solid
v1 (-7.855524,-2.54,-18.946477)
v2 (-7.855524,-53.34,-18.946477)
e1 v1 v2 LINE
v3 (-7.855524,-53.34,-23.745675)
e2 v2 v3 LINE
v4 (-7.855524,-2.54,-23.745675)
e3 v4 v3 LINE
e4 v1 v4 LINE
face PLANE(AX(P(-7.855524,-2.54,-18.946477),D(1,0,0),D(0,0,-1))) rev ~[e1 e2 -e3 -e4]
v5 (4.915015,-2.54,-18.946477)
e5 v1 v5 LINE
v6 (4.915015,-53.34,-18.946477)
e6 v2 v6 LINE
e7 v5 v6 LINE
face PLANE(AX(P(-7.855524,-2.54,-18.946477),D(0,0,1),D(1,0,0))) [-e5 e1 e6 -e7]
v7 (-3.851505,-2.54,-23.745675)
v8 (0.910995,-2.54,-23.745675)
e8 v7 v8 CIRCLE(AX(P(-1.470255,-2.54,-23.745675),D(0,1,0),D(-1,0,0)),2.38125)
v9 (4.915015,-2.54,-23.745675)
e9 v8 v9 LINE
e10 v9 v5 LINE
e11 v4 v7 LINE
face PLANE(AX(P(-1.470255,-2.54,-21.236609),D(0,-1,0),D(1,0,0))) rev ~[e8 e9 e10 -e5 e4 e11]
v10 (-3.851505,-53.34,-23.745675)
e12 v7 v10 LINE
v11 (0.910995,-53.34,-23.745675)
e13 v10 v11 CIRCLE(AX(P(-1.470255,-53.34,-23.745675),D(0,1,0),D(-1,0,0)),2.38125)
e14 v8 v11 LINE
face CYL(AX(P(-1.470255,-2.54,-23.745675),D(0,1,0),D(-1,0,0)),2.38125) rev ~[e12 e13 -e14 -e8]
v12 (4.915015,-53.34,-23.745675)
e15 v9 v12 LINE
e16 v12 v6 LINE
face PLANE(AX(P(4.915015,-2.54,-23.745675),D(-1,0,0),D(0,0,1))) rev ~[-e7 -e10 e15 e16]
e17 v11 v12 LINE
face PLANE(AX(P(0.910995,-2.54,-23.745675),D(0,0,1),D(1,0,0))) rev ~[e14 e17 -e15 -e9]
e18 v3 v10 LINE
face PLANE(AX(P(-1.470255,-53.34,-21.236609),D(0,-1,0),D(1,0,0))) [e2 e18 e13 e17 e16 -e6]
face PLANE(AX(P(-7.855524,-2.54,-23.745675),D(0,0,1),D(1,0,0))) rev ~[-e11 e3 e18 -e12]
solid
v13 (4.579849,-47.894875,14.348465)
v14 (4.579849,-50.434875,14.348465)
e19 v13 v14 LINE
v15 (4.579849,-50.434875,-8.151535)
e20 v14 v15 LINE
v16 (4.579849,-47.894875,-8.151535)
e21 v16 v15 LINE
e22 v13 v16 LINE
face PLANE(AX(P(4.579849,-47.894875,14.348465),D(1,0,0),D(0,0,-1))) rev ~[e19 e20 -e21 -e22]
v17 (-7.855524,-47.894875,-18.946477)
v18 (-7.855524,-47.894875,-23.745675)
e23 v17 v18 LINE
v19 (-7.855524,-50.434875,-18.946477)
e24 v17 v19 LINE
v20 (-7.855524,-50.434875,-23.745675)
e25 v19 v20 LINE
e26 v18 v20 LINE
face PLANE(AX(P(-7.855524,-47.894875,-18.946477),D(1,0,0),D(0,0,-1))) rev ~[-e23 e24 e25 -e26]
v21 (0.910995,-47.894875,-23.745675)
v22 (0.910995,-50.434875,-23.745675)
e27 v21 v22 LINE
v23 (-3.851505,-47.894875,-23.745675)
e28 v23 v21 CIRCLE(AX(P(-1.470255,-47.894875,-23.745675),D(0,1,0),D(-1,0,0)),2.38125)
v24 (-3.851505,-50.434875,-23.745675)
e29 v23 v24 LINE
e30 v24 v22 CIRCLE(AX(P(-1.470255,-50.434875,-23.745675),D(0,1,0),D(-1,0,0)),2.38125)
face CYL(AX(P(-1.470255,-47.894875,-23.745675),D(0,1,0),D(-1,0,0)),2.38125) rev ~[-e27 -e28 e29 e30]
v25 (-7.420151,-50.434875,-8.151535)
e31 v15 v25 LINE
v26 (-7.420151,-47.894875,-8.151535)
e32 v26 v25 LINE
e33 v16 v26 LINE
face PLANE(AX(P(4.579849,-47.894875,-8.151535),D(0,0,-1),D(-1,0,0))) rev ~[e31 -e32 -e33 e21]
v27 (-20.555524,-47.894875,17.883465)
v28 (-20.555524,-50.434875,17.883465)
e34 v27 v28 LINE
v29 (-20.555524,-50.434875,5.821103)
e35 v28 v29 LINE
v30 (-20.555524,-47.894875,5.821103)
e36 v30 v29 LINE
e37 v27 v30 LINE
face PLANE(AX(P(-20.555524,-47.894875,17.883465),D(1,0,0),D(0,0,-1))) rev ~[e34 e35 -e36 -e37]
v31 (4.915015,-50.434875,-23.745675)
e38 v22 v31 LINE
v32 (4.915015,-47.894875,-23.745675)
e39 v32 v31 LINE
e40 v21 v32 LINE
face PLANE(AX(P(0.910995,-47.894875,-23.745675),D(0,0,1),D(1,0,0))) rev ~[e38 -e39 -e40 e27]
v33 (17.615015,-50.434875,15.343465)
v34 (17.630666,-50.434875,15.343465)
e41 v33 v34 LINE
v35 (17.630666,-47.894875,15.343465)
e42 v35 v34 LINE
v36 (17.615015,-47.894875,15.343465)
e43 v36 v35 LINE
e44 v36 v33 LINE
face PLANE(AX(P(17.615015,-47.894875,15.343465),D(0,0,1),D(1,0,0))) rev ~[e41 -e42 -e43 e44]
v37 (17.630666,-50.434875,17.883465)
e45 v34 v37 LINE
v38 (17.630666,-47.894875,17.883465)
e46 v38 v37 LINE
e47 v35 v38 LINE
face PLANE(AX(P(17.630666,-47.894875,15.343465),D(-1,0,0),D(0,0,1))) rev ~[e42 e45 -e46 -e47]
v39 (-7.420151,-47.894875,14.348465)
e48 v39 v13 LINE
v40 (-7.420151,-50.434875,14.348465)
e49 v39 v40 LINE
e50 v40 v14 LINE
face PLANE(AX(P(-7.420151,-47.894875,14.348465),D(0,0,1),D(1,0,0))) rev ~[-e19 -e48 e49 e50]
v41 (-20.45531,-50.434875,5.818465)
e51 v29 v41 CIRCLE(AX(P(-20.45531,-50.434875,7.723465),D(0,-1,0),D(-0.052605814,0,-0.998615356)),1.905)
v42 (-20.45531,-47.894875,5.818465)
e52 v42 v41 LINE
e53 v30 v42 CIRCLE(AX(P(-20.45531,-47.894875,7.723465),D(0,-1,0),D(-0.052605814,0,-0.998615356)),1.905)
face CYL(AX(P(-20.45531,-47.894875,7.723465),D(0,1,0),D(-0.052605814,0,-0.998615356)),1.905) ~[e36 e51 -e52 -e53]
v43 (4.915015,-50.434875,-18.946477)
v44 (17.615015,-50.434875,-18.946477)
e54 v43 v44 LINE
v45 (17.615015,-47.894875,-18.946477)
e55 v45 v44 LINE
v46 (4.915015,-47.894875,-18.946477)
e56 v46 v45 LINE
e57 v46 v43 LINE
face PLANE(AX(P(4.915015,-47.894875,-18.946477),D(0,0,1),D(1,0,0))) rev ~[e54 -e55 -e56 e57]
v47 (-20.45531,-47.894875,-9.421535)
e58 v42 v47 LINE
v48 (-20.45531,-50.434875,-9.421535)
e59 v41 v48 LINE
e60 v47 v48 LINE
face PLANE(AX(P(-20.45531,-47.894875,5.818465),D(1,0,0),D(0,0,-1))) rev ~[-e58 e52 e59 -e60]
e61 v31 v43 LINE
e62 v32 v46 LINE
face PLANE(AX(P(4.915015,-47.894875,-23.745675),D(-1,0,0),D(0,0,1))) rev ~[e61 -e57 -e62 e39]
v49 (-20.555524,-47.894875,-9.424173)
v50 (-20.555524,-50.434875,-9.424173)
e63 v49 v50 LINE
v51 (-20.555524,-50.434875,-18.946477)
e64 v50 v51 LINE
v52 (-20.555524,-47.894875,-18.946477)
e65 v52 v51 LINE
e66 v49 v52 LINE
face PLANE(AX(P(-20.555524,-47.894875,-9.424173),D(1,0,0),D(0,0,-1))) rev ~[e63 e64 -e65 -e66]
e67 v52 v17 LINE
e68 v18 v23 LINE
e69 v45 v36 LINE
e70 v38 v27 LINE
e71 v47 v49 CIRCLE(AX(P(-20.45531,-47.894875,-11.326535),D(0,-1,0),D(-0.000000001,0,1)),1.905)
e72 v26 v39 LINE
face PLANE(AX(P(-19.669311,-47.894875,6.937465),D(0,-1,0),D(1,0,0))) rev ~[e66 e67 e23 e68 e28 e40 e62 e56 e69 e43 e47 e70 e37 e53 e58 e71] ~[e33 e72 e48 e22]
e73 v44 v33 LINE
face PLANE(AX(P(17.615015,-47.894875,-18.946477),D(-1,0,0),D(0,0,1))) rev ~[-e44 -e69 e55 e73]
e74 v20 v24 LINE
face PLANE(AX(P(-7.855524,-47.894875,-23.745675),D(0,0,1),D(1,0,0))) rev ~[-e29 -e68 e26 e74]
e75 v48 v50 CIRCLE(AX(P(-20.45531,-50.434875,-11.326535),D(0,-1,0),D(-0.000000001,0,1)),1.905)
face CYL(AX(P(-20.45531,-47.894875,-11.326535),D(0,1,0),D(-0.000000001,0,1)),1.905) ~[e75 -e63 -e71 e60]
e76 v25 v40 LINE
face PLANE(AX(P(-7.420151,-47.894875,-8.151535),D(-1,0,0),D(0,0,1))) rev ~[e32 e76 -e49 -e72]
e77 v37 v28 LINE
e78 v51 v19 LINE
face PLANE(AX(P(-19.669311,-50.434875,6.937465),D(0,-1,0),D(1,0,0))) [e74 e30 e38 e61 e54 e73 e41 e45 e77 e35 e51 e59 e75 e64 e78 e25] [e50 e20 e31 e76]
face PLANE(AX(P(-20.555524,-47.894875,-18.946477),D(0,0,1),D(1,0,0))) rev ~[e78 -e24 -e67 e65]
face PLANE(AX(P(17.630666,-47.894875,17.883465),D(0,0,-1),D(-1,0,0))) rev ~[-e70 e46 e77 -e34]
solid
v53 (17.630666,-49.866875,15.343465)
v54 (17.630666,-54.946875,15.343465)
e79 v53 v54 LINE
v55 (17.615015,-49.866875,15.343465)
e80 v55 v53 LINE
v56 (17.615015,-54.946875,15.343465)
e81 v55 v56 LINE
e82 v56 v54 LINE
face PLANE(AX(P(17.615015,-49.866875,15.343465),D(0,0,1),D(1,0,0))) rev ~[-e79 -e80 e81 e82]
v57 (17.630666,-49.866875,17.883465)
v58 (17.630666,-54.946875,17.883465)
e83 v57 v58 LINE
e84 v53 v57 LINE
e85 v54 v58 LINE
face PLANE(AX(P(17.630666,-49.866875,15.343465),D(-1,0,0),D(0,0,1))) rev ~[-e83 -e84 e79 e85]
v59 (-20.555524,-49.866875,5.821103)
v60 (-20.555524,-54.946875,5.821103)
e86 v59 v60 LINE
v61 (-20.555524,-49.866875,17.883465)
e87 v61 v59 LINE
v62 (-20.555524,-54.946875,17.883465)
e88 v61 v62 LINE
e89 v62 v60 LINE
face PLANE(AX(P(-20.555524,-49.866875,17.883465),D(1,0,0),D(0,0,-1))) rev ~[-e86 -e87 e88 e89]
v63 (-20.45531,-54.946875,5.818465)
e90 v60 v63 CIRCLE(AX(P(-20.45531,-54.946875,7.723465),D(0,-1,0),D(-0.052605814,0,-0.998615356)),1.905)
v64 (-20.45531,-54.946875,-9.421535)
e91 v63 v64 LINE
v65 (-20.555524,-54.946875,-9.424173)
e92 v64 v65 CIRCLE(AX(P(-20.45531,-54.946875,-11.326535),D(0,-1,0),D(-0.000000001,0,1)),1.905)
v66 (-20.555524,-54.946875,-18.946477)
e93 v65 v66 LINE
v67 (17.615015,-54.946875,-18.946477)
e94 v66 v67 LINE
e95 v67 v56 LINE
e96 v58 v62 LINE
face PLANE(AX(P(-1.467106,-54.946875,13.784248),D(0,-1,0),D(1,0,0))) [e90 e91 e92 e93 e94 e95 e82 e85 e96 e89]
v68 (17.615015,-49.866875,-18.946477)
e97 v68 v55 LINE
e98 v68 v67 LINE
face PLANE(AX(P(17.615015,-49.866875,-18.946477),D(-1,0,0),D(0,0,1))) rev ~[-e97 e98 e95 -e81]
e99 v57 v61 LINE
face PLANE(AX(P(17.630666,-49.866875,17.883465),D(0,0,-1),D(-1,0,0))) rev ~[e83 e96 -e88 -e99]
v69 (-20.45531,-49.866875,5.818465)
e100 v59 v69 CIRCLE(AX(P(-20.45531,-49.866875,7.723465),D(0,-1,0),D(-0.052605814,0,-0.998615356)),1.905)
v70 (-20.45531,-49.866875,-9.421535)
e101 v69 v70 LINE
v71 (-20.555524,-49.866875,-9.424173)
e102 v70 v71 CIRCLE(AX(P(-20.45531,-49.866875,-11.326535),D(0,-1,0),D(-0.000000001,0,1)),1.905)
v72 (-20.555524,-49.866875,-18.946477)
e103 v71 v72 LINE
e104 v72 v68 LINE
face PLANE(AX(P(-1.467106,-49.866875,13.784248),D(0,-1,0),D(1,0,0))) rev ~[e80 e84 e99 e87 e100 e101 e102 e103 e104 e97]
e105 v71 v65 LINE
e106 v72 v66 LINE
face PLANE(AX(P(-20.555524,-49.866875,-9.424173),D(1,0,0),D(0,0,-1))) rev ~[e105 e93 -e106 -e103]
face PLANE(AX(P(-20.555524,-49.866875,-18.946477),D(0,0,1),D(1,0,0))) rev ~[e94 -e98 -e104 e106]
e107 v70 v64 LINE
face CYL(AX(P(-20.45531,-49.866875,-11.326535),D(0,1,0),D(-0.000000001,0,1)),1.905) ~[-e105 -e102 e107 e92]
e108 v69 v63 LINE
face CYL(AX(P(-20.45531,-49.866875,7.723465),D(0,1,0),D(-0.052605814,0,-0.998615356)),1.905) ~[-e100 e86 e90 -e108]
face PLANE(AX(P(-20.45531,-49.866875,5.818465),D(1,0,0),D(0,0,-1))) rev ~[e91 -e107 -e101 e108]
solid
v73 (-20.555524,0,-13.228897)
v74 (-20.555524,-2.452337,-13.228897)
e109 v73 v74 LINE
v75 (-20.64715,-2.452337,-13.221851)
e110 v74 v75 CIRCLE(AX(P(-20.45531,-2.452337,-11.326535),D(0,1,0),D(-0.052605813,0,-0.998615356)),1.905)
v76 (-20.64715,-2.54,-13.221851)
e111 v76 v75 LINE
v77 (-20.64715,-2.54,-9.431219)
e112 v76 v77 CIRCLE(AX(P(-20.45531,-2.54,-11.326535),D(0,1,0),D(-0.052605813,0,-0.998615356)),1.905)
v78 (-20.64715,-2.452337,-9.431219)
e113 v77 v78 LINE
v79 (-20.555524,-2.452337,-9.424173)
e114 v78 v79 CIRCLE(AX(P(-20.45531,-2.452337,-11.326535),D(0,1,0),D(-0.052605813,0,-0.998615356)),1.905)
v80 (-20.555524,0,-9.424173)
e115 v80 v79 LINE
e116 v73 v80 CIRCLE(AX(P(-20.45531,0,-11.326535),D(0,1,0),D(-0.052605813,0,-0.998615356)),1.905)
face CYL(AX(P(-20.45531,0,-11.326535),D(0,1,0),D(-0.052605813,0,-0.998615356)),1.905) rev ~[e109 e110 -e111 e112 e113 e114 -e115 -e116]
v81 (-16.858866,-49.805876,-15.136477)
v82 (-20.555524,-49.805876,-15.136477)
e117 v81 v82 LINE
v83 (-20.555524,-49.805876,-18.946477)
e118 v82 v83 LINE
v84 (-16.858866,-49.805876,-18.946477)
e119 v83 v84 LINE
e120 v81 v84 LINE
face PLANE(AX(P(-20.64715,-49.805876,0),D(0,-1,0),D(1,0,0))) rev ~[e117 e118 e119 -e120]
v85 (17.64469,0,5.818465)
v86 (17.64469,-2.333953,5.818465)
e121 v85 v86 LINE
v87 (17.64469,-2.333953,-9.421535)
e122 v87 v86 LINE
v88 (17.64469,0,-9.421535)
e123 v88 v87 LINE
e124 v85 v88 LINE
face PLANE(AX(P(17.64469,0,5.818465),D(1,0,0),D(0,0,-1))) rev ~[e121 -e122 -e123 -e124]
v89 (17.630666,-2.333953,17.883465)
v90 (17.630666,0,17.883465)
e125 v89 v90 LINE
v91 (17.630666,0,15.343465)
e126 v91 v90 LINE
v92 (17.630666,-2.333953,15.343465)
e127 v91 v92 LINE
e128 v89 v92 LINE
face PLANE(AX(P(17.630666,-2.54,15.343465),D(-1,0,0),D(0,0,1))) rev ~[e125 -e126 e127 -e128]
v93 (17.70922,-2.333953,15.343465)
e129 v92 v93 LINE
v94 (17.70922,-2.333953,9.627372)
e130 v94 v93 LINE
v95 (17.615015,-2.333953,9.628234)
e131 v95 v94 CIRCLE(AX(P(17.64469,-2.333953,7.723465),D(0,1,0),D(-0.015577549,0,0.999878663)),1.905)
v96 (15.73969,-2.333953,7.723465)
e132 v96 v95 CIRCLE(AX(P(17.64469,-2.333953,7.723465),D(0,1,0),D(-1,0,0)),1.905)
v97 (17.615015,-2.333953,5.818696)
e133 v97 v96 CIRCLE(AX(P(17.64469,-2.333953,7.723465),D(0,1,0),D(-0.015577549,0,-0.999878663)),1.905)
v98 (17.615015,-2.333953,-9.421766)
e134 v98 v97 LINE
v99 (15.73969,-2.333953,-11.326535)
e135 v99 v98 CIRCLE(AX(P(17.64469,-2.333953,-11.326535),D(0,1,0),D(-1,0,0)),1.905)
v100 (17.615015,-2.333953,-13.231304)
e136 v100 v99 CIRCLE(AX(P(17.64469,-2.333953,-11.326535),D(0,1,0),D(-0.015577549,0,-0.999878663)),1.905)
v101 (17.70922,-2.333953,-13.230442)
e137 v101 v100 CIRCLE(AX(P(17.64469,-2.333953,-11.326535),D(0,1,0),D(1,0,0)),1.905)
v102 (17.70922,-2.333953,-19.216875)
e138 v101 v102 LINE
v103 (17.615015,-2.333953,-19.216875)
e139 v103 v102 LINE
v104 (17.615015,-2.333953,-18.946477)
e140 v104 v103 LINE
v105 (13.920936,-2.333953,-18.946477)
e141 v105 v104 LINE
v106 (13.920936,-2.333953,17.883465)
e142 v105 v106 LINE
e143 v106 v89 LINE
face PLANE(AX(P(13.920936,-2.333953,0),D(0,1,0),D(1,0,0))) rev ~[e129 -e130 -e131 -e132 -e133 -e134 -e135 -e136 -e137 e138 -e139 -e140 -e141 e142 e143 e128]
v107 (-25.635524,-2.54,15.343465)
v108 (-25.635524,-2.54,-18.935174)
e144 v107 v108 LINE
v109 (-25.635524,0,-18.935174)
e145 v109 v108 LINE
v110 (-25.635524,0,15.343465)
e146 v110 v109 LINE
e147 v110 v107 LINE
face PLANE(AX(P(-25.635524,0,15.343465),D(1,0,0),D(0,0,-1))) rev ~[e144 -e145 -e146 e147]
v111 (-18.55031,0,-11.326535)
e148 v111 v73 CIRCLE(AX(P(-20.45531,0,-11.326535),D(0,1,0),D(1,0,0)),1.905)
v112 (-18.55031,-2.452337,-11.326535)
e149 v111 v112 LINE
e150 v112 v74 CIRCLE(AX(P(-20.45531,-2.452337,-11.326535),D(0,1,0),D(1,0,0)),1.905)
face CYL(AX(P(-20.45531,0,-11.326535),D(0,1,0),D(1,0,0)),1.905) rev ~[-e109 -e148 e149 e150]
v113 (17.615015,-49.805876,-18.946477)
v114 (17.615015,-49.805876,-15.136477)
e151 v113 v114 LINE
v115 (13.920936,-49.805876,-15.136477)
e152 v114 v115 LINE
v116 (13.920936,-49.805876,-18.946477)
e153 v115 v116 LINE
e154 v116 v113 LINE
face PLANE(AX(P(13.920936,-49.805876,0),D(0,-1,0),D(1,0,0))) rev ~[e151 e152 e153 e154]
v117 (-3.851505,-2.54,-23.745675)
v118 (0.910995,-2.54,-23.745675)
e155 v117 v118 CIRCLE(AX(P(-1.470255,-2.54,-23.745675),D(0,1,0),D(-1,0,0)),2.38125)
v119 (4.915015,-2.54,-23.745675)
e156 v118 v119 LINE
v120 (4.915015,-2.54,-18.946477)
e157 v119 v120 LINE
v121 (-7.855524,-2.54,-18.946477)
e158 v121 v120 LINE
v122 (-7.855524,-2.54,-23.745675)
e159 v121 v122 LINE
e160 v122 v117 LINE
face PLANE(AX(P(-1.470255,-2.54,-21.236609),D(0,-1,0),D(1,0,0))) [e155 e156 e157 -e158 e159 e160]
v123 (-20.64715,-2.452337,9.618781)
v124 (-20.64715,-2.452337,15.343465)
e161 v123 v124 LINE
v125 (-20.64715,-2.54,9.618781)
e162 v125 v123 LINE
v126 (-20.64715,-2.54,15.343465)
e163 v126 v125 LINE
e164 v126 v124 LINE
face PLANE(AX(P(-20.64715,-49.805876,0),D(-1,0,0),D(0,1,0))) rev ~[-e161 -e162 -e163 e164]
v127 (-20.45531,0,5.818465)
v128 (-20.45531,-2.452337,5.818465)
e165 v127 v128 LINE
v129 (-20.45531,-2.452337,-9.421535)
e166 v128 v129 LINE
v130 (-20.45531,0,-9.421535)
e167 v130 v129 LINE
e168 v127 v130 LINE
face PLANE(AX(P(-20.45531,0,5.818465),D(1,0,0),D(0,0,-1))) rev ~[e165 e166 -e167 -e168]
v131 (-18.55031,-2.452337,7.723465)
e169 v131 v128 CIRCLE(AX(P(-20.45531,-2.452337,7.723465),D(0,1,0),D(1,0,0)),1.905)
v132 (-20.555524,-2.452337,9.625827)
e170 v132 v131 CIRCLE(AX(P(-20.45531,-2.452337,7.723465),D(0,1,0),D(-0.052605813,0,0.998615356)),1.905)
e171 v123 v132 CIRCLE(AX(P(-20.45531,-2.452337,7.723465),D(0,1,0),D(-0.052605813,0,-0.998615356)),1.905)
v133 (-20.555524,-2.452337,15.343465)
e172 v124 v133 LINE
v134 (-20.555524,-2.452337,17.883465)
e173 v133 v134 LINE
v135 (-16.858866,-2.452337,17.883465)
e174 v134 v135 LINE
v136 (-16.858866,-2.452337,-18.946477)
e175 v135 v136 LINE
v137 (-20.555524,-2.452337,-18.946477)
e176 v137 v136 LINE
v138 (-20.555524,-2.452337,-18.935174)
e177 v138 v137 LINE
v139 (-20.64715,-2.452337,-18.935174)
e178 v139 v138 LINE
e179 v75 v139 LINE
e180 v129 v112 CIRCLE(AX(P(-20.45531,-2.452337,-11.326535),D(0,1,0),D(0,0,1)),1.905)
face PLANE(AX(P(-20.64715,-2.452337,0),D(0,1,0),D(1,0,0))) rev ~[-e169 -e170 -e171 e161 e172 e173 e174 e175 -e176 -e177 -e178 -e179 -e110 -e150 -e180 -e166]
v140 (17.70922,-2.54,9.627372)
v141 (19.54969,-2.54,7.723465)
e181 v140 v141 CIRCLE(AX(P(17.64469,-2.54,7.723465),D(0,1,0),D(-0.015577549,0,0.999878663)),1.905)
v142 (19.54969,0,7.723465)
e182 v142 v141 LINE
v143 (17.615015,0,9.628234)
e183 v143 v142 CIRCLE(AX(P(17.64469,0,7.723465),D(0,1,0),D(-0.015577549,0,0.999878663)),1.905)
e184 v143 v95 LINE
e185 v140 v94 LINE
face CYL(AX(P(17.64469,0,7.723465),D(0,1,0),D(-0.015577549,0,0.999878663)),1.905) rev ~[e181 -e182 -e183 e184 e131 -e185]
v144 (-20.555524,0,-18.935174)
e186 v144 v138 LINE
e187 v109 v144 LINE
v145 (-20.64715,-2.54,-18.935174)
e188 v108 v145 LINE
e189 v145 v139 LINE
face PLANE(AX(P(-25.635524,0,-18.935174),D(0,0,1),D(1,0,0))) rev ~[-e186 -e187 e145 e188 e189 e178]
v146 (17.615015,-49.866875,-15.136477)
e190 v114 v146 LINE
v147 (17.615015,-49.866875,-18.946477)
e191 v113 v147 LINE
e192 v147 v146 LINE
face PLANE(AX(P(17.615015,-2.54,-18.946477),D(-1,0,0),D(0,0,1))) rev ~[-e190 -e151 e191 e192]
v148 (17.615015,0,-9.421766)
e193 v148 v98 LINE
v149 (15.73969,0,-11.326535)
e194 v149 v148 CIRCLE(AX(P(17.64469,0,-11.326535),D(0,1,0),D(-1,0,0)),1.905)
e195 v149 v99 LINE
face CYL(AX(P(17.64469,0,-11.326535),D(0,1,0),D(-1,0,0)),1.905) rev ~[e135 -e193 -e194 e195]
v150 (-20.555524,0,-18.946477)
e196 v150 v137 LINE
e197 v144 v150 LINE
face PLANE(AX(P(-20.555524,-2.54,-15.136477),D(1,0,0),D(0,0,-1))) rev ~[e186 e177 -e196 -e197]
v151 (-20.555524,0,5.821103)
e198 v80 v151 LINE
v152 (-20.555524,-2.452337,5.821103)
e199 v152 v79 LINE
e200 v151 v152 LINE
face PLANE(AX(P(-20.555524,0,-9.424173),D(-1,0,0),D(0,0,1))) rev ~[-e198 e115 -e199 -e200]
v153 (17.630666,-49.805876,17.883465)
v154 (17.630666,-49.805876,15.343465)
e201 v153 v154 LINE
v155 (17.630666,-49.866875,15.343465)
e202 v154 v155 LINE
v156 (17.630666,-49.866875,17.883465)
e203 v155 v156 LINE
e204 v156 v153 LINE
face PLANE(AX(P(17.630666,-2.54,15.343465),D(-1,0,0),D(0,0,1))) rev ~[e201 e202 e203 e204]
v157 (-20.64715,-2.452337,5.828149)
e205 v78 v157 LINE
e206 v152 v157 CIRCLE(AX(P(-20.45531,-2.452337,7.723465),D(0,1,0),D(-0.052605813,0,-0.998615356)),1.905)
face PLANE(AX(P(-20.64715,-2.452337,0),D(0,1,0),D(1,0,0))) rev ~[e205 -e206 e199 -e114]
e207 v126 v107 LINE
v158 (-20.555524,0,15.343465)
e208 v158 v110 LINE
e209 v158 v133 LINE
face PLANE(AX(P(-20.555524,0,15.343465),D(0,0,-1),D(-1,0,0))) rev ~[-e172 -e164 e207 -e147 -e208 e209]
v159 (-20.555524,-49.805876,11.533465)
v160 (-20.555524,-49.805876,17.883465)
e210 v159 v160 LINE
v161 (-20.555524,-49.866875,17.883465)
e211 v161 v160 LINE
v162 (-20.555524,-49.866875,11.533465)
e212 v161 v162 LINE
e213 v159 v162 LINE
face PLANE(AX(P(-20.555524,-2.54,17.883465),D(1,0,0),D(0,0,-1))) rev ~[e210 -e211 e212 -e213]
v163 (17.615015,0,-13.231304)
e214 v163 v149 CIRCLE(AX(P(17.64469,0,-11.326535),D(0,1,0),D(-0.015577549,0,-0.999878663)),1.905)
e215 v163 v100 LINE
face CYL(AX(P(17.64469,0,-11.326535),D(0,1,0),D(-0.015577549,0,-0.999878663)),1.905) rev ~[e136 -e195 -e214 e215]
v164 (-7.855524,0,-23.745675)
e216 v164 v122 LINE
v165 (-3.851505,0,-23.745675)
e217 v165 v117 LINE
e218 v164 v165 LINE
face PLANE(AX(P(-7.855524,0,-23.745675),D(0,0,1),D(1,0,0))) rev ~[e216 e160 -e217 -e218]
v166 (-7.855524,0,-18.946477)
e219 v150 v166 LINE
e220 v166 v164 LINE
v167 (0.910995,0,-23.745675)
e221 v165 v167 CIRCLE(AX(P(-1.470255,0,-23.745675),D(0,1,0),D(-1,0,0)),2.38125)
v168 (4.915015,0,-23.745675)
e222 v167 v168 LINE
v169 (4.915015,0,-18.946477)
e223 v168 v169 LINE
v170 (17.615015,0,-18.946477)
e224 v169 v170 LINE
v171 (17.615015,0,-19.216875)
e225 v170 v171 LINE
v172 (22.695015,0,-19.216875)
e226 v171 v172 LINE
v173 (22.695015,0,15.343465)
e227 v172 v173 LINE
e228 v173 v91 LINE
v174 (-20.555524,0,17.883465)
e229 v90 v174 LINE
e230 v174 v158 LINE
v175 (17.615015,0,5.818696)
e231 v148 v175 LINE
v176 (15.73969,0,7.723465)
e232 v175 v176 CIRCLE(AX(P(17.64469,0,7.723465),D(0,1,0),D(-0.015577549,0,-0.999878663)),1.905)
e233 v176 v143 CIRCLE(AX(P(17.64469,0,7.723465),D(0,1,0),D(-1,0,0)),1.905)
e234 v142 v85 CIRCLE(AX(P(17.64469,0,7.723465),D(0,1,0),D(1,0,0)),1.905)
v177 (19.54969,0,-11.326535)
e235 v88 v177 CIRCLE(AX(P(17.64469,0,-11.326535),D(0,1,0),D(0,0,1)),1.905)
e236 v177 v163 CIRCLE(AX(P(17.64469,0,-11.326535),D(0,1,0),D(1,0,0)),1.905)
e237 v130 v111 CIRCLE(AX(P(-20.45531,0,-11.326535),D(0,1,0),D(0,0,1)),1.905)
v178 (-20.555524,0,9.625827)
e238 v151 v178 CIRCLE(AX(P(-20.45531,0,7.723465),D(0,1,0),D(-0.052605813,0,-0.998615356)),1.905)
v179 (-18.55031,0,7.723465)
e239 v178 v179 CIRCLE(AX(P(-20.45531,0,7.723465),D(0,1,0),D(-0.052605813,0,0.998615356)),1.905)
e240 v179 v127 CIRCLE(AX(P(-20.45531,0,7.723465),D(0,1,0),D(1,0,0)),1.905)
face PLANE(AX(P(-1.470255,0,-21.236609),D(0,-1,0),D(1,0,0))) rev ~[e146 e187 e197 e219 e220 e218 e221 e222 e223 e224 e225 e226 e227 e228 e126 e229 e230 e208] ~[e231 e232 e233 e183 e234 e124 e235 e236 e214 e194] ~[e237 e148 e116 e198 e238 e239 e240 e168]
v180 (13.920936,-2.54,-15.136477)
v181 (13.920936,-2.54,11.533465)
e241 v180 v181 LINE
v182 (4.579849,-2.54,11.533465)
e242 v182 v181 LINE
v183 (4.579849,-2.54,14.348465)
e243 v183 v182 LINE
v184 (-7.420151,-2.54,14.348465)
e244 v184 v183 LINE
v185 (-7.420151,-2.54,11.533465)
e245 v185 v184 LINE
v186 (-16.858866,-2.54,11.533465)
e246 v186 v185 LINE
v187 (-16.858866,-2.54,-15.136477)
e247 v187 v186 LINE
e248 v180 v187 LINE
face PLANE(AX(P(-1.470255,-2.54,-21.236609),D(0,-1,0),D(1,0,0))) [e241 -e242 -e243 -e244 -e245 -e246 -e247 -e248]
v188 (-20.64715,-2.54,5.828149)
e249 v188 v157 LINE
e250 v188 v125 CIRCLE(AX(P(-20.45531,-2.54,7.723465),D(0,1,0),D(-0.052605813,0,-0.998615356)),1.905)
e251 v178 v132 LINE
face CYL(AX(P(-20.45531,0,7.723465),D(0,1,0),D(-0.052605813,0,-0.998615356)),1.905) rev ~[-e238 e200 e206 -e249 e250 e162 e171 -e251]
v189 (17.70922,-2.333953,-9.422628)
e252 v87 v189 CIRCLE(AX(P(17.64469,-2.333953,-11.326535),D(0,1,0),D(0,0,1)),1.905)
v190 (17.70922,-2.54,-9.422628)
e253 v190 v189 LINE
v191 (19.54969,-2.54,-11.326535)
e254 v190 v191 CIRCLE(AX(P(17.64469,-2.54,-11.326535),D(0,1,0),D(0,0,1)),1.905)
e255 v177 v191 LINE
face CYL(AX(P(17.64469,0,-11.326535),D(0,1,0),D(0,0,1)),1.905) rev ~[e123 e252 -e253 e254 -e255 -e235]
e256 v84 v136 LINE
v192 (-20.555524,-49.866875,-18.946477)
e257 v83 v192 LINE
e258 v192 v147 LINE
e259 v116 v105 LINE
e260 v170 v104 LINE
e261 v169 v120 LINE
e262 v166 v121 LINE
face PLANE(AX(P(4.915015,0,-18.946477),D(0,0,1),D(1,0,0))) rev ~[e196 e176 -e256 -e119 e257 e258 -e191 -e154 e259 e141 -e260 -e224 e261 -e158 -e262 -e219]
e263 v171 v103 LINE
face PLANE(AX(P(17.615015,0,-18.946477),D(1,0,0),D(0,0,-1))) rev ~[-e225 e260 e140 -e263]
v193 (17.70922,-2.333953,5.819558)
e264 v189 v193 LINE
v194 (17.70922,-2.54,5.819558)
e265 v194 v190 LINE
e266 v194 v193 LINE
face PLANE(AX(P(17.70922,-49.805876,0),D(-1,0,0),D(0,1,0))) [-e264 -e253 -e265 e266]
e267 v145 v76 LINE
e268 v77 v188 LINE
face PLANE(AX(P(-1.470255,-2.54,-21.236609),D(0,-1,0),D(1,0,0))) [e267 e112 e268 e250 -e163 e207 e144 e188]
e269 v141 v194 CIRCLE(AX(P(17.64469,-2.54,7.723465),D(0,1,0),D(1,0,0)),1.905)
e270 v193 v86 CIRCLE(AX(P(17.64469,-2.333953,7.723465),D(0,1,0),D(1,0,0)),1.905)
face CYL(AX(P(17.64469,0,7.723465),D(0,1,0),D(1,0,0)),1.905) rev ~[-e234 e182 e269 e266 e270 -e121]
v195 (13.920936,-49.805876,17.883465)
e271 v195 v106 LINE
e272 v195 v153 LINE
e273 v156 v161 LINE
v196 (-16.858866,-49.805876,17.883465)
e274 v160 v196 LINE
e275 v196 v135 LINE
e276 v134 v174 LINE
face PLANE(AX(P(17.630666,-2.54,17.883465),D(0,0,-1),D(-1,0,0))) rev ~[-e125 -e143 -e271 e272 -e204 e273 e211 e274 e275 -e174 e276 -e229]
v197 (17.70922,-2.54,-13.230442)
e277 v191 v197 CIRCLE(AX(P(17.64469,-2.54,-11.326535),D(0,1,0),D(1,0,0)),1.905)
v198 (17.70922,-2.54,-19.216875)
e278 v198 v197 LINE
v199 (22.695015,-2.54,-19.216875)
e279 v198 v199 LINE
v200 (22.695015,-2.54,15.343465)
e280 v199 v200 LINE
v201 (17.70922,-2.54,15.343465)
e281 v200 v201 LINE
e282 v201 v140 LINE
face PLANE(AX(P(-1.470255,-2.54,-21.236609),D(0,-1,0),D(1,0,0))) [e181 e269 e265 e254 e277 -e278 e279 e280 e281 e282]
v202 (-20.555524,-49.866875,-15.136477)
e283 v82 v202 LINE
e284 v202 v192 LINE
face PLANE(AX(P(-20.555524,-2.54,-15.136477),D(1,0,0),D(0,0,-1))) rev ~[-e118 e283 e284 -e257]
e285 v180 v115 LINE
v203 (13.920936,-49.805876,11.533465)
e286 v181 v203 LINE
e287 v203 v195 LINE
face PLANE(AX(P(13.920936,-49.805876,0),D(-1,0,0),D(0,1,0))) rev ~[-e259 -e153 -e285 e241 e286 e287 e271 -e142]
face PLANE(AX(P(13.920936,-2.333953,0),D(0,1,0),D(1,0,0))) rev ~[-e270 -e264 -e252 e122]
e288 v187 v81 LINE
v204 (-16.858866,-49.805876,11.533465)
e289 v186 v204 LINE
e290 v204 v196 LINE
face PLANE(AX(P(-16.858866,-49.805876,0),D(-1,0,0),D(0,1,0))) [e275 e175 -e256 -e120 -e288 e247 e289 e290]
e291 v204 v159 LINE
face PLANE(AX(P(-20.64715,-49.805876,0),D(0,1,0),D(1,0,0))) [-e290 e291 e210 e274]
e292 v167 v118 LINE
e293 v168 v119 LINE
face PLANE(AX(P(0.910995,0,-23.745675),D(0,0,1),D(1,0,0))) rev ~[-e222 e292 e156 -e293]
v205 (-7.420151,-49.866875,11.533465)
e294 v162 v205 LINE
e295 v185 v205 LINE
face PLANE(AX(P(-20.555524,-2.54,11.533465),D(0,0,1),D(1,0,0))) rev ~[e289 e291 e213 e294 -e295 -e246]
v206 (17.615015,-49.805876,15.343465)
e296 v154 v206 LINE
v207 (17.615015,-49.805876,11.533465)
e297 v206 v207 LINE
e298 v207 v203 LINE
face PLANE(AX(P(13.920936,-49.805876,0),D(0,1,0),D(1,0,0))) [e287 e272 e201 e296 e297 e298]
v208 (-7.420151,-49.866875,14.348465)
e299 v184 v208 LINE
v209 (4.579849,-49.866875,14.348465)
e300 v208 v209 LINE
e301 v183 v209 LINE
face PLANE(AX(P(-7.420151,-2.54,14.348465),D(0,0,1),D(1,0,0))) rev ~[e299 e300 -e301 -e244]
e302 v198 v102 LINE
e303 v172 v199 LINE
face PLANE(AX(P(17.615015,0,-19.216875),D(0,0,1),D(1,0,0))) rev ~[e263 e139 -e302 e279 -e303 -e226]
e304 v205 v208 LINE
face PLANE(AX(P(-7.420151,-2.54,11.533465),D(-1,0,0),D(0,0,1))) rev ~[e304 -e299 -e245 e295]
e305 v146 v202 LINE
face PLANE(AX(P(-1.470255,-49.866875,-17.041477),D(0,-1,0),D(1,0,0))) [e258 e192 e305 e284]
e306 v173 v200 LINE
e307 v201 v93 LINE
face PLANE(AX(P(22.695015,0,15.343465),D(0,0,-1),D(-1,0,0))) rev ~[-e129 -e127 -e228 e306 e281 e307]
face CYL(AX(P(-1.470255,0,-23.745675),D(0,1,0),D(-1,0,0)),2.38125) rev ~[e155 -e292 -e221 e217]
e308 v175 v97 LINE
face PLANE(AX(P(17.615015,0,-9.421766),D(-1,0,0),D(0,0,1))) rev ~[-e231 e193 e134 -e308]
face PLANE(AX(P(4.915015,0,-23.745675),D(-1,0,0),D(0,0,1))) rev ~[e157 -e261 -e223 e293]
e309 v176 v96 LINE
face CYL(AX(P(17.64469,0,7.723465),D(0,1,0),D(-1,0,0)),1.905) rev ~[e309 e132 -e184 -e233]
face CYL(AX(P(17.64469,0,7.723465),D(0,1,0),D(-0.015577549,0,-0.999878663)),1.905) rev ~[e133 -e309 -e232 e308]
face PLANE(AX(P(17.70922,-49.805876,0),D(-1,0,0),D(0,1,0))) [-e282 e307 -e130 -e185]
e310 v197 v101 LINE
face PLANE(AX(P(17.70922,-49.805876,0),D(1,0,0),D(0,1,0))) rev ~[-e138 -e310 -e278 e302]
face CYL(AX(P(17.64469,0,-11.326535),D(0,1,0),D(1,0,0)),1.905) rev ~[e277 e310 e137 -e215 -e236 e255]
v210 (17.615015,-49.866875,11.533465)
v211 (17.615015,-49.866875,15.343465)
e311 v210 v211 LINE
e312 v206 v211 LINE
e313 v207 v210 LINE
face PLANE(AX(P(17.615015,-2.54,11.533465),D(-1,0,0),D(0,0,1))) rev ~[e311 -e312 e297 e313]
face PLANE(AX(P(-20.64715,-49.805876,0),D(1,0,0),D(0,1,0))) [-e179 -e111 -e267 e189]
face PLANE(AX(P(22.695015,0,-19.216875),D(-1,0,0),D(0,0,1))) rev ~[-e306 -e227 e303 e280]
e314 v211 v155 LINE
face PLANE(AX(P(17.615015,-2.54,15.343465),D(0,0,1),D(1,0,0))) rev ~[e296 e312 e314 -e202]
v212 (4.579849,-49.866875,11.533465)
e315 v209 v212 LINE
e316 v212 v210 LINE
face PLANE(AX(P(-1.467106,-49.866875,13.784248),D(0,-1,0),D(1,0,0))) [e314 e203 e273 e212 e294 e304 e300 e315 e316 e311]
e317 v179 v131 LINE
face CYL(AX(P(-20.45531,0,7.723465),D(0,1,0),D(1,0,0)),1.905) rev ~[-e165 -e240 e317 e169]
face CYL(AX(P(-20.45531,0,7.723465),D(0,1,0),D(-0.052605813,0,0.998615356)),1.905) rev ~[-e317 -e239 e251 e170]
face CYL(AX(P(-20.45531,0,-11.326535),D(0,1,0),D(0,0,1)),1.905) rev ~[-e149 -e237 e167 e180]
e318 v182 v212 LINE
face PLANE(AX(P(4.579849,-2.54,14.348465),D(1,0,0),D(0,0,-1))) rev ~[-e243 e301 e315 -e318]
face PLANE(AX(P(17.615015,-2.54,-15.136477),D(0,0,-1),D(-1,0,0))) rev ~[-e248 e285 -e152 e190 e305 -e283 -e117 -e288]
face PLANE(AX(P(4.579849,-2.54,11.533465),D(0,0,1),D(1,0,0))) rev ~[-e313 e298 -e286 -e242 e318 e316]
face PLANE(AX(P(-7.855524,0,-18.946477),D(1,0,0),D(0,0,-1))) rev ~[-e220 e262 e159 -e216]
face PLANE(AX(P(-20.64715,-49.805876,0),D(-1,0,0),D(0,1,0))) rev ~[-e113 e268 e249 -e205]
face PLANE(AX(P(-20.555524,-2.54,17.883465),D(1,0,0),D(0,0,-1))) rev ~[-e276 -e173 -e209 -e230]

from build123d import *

# Parameters (mm, degrees)
F0_W          = 6.0148409306
F0_H          = 9.525
F0_W_2        = 5.9851590694
F0_H_2        = 6.35
F0_W_3        = 12
F0_H_3        = 2.815
F1_DEPTH      = 2.54
F2_START      = 2.54
F2_DEPTH      = 47.326875
F3_START      = 49.866875
F3_DEPTH      = 5.08
F4_START      = 47.894875
F4_DEPTH      = 2.54
F5_DEPTH      = 50.8
F6_W          = 3.7882840261
F6_H          = 47.471923288
F6_W_2        = 3.7882830948
F6_H_2        = 47.3535386845
F7_DEPTH      = 25.4
F7_DEPTH_BACK = 25.4


# Not quite as in the source:
# - a feature names something its author has since deleted; it is built from what else it names


with BuildPart() as f1:
    # F0 (on Front) → F1 (new body)
    with BuildSketch(Plane.XZ):
        with BuildLine():
            Line((4.9150146872, -18.9464773988), (-7.8555241555, -18.9464773988))
            Line((-7.8555241555, -18.9464773988), (-7.8555241555, -23.7456746399))
            Line((-7.8555241555, -23.7456746399), (-3.8515047342, -23.7456746399))
            ThreePointArc((-3.8515047342, -23.7456746399), (-1.4702547342, -21.3644246399), (0.9109952658, -23.7456746399))
            Line((0.9109952658, -23.7456746399), (4.9150146872, -23.7456746399))
            Line((4.9150146872, -23.7456746399), (4.9150146872, -18.9464773988))
        make_face()
        Polygon((-20.5555241555, 11.5334648176), (-7.4201510128, 11.5334648176), (-7.4201510128, 14.3484648176), (4.5798489872, 14.3484648176), (4.5798489872, 11.5334648176), (17.6150146872, 11.5334648176), (17.6150146872, 15.3434648176), (-20.5555241555, 15.3434648176), align=None)
        Polygon((17.6150146872, -15.1364773988), (-20.5555241555, -15.1364773988), (-20.5555241555, -18.9351737499), (-20.5555241555, -18.9464773988), (-7.8555241555, -18.9464773988), (4.9150146872, -18.9464773988), (17.6150146872, -18.9464773988), align=None)
        with BuildLine():
            Line((17.6150146872, 15.3434648176), (17.6150146872, 11.5334648176))
            Line((17.6150146872, 11.5334648176), (17.6150146872, 9.6282336699))
            ThreePointArc((17.6150146872, 9.6282336699), (18.9811953771, 9.0809544703), (19.5496899178, 7.7234648176))
            ThreePointArc((19.5496899178, 7.7234648176), (18.9917283359, 6.3764263994), (17.6446899178, 5.8184648176))
            Line((17.6446899178, 5.8184648176), (17.6446899178, -1.8015351824))
            Line((17.6446899178, -1.8015351824), (17.6446899178, -9.4215351824))
            ThreePointArc((17.6446899178, -9.4215351824), (18.9917283359, -9.9794967643), (19.5496899178, -11.3265351824))
            ThreePointArc((19.5496899178, -11.3265351824), (18.9811953771, -12.6840248351), (17.6150146872, -13.2313040347))
            Line((17.6150146872, -13.2313040347), (17.6150146872, -15.1364773988))
            Line((17.6150146872, -15.1364773988), (17.6150146872, -18.9464773988))
            Line((17.6150146872, -18.9464773988), (17.6150146872, -19.2168746144))
            Line((17.6150146872, -19.2168746144), (22.6950146872, -19.2168746144))
            Line((22.6950146872, -19.2168746144), (22.6950146872, 15.3434648176))
            Line((22.6950146872, 15.3434648176), (17.6306664944, 15.3434648176))
            Line((17.6306664944, 15.3434648176), (17.6150146872, 15.3434648176))
        make_face()
        with BuildLine():
            ThreePointArc((-20.5555241555, 5.8211025651), (-22.3603100822, 7.7234648176), (-20.5555241555, 9.62582707))
            Line((-20.5555241555, 9.62582707), (-20.5555241555, 11.5334648176))
            Line((-20.5555241555, 11.5334648176), (-20.5555241555, 15.3434648176))
            Line((-20.5555241555, 15.3434648176), (-25.6355241555, 15.3434648176))
            Line((-25.6355241555, 15.3434648176), (-25.6355241555, -18.9351737499))
            Line((-25.6355241555, -18.9351737499), (-20.5555241555, -18.9351737499))
            Line((-20.5555241555, -18.9351737499), (-20.5555241555, -15.1364773988))
            Line((-20.5555241555, -15.1364773988), (-20.5555241555, -13.2288974349))
            ThreePointArc((-20.5555241555, -13.2288974349), (-22.3603100822, -11.3265351824), (-20.5555241555, -9.42417293))
            Line((-20.5555241555, -9.42417293), (-20.5555241555, 5.8211025651))
        make_face()
        with BuildLine():
            Line((4.5798489872, 11.5334648176), (4.5798489872, 7.7234648176))
            Line((4.5798489872, 7.7234648176), (15.7396899178, 7.7234648176))
            ThreePointArc((15.7396899178, 7.7234648176), (16.2872002651, 9.0599702769), (17.6150146872, 9.6282336699))
            Line((17.6150146872, 9.6282336699), (17.6150146872, 11.5334648176))
            Line((17.6150146872, 11.5334648176), (4.5798489872, 11.5334648176))
        make_face()
        Polygon((-7.4201510128, 11.5334648176), (-7.4201510128, 7.7234648176), (-1.4053100822, 7.7234648176), (4.5798489872, 7.7234648176), (4.5798489872, 11.5334648176), align=None)
        with BuildLine():
            ThreePointArc((-20.5555241555, 9.62582707), (-19.1441813337, 9.1054801593), (-18.5503100822, 7.7234648176))
            Line((-18.5503100822, 7.7234648176), (-7.4201510128, 7.7234648176))
            Line((-7.4201510128, 7.7234648176), (-7.4201510128, 11.5334648176))
            Line((-7.4201510128, 11.5334648176), (-20.5555241555, 11.5334648176))
            Line((-20.5555241555, 11.5334648176), (-20.5555241555, 9.62582707))
        make_face()
        with BuildLine():
            Line((-1.4053100822, -11.3265351824), (-18.5503100822, -11.3265351824))
            ThreePointArc((-18.5503100822, -11.3265351824), (-19.1441813337, -12.7085505242), (-20.5555241555, -13.2288974349))
            Line((-20.5555241555, -13.2288974349), (-20.5555241555, -15.1364773988))
            Line((-20.5555241555, -15.1364773988), (17.6150146872, -15.1364773988))
            Line((17.6150146872, -15.1364773988), (17.6150146872, -13.2313040347))
            ThreePointArc((17.6150146872, -13.2313040347), (16.2872002651, -12.6630406418), (15.7396899178, -11.3265351824))
            Line((15.7396899178, -11.3265351824), (-1.4053100822, -11.3265351824))
        make_face()
        with BuildLine():
            Line((-7.4201510128, 7.7234648176), (-18.5503100822, 7.7234648176))
            ThreePointArc((-18.5503100822, 7.7234648176), (-19.1082716641, 6.3764263994), (-20.4553100822, 5.8184648176))
            Line((-20.4553100822, 5.8184648176), (-20.4553100822, -1.8015351824))
            Line((-20.4553100822, -1.8015351824), (-7.4201510128, -1.8015351824))
            Line((-7.4201510128, -1.8015351824), (-7.4201510128, 7.7234648176))
        make_face()
        with Locations((-4.4127305475, 2.9609648176)):
            Rectangle(F0_W, F0_H)
        with Locations((1.5872694525, 2.9609648176)):
            Rectangle(F0_W_2, F0_H)
        with BuildLine():
            Line((17.6150146872, -1.8015351824), (4.5798489872, -1.8015351824))
            Line((4.5798489872, -1.8015351824), (4.5798489872, -8.1515351824))
            Line((4.5798489872, -8.1515351824), (-1.4053100822, -8.1515351824))
            Line((-1.4053100822, -8.1515351824), (-1.4053100822, -11.3265351824))
            Line((-1.4053100822, -11.3265351824), (15.7396899178, -11.3265351824))
            ThreePointArc((15.7396899178, -11.3265351824), (16.2872002651, -9.9900297231), (17.6150146872, -9.4217663301))
            Line((17.6150146872, -9.4217663301), (17.6150146872, -1.8015351824))
        make_face()
        with BuildLine():
            Line((-7.4201510128, -1.8015351824), (-20.4553100822, -1.8015351824))
            Line((-20.4553100822, -1.8015351824), (-20.4553100822, -9.4215351824))
            ThreePointArc((-20.4553100822, -9.4215351824), (-19.1082716641, -9.9794967643), (-18.5503100822, -11.3265351824))
            Line((-18.5503100822, -11.3265351824), (-1.4053100822, -11.3265351824))
            Line((-1.4053100822, -11.3265351824), (-1.4053100822, -8.1515351824))
            Line((-1.4053100822, -8.1515351824), (-7.4201510128, -8.1515351824))
            Line((-7.4201510128, -8.1515351824), (-7.4201510128, -1.8015351824))
        make_face()
        with Locations((-4.4127305475, -4.9765351824)):
            Rectangle(F0_W, F0_H_2)
        with Locations((1.5872694525, -4.9765351824)):
            Rectangle(F0_W_2, F0_H_2)
        with BuildLine():
            Line((15.7396899178, 7.7234648176), (4.5798489872, 7.7234648176))
            Line((4.5798489872, 7.7234648176), (4.5798489872, -1.8015351824))
            Line((4.5798489872, -1.8015351824), (17.6150146872, -1.8015351824))
            Line((17.6150146872, -1.8015351824), (17.6150146872, 5.8186959653))
            ThreePointArc((17.6150146872, 5.8186959653), (16.2872002651, 6.3869593582), (15.7396899178, 7.7234648176))
        make_face()
        with Locations((-1.4201510128, 12.9409648176)):
            Rectangle(F0_W_3, F0_H_3)
        Polygon((-20.5555241555, 17.8834648176), (-20.5555241555, 15.3434648176), (17.6150146872, 15.3434648176), (17.6306664944, 15.3434648176), (17.6306664944, 17.8834648176), align=None)
    extrude(amount=F1_DEPTH)

    # F0 (on Front) → F2 (join)
    with BuildSketch(Plane.XZ.offset(F2_START)):
        Polygon((-20.5555241555, 11.5334648176), (-7.4201510128, 11.5334648176), (-7.4201510128, 14.3484648176), (4.5798489872, 14.3484648176), (4.5798489872, 11.5334648176), (17.6150146872, 11.5334648176), (17.6150146872, 15.3434648176), (-20.5555241555, 15.3434648176), align=None)
        Polygon((17.6150146872, -15.1364773988), (-20.5555241555, -15.1364773988), (-20.5555241555, -18.9351737499), (-20.5555241555, -18.9464773988), (-7.8555241555, -18.9464773988), (4.9150146872, -18.9464773988), (17.6150146872, -18.9464773988), align=None)
        Polygon((-20.5555241555, 17.8834648176), (-20.5555241555, 15.3434648176), (17.6150146872, 15.3434648176), (17.6306664944, 15.3434648176), (17.6306664944, 17.8834648176), align=None)
    extrude(amount=F2_DEPTH)


with BuildPart() as f3:
    # F0 (on Front) → F3 (new body)
    with BuildSketch(Plane.XZ.offset(F3_START)):
        Polygon((-20.5555241555, 11.5334648176), (-7.4201510128, 11.5334648176), (-7.4201510128, 14.3484648176), (4.5798489872, 14.3484648176), (4.5798489872, 11.5334648176), (17.6150146872, 11.5334648176), (17.6150146872, 15.3434648176), (-20.5555241555, 15.3434648176), align=None)
        Polygon((17.6150146872, -15.1364773988), (-20.5555241555, -15.1364773988), (-20.5555241555, -18.9351737499), (-20.5555241555, -18.9464773988), (-7.8555241555, -18.9464773988), (4.9150146872, -18.9464773988), (17.6150146872, -18.9464773988), align=None)
        with BuildLine():
            Line((4.5798489872, 11.5334648176), (4.5798489872, 7.7234648176))
            Line((4.5798489872, 7.7234648176), (15.7396899178, 7.7234648176))
            ThreePointArc((15.7396899178, 7.7234648176), (16.2872002651, 9.0599702769), (17.6150146872, 9.6282336699))
            Line((17.6150146872, 9.6282336699), (17.6150146872, 11.5334648176))
            Line((17.6150146872, 11.5334648176), (4.5798489872, 11.5334648176))
        make_face()
        Polygon((-7.4201510128, 11.5334648176), (-7.4201510128, 7.7234648176), (-1.4053100822, 7.7234648176), (4.5798489872, 7.7234648176), (4.5798489872, 11.5334648176), align=None)
        with BuildLine():
            ThreePointArc((-20.5555241555, 9.62582707), (-19.1441813337, 9.1054801593), (-18.5503100822, 7.7234648176))
            Line((-18.5503100822, 7.7234648176), (-7.4201510128, 7.7234648176))
            Line((-7.4201510128, 7.7234648176), (-7.4201510128, 11.5334648176))
            Line((-7.4201510128, 11.5334648176), (-20.5555241555, 11.5334648176))
            Line((-20.5555241555, 11.5334648176), (-20.5555241555, 9.62582707))
        make_face()
        with BuildLine():
            Line((-20.4553100822, 5.8184648176), (-20.4553100822, 7.7234648176))
            Line((-20.4553100822, 7.7234648176), (-18.5503100822, 7.7234648176))
            ThreePointArc((-18.5503100822, 7.7234648176), (-19.1441813337, 9.1054801593), (-20.5555241555, 9.62582707))
            Line((-20.5555241555, 9.62582707), (-20.5555241555, 5.8211025651))
            ThreePointArc((-20.5555241555, 5.8211025651), (-20.505434473, 5.8191243686), (-20.4553100822, 5.8184648176))
        make_face()
        with BuildLine():
            Line((-1.4053100822, -11.3265351824), (-18.5503100822, -11.3265351824))
            ThreePointArc((-18.5503100822, -11.3265351824), (-19.1441813337, -12.7085505242), (-20.5555241555, -13.2288974349))
            Line((-20.5555241555, -13.2288974349), (-20.5555241555, -15.1364773988))
            Line((-20.5555241555, -15.1364773988), (17.6150146872, -15.1364773988))
            Line((17.6150146872, -15.1364773988), (17.6150146872, -13.2313040347))
            ThreePointArc((17.6150146872, -13.2313040347), (16.2872002651, -12.6630406418), (15.7396899178, -11.3265351824))
            Line((15.7396899178, -11.3265351824), (-1.4053100822, -11.3265351824))
        make_face()
        with BuildLine():
            ThreePointArc((-18.5503100822, -11.3265351824), (-19.1082716641, -9.9794967643), (-20.4553100822, -9.4215351824))
            Line((-20.4553100822, -9.4215351824), (-20.4553100822, -11.3265351824))
            Line((-20.4553100822, -11.3265351824), (-18.5503100822, -11.3265351824))
        make_face()
        with BuildLine():
            Line((-20.4553100822, -11.3265351824), (-20.4553100822, -9.4215351824))
            ThreePointArc((-20.4553100822, -9.4215351824), (-20.505434473, -9.4221947335), (-20.5555241555, -9.42417293))
            Line((-20.5555241555, -9.42417293), (-20.5555241555, -13.2288974349))
            ThreePointArc((-20.5555241555, -13.2288974349), (-19.1441813337, -12.7085505242), (-18.5503100822, -11.3265351824))
            Line((-18.5503100822, -11.3265351824), (-20.4553100822, -11.3265351824))
        make_face()
        with BuildLine():
            Line((17.6150146872, -11.3265351824), (15.7396899178, -11.3265351824))
            ThreePointArc((15.7396899178, -11.3265351824), (16.2872002651, -12.6630406418), (17.6150146872, -13.2313040347))
            Line((17.6150146872, -13.2313040347), (17.6150146872, -11.3265351824))
        make_face()
        with BuildLine():
            ThreePointArc((17.6150146872, -9.4217663301), (16.2872002651, -9.9900297231), (15.7396899178, -11.3265351824))
            Line((15.7396899178, -11.3265351824), (17.6150146872, -11.3265351824))
            Line((17.6150146872, -11.3265351824), (17.6150146872, -9.4217663301))
        make_face()
        with BuildLine():
            ThreePointArc((17.6150146872, 9.6282336699), (16.2872002651, 9.0599702769), (15.7396899178, 7.7234648176))
            Line((15.7396899178, 7.7234648176), (17.6150146872, 7.7234648176))
            Line((17.6150146872, 7.7234648176), (17.6150146872, 9.6282336699))
        make_face()
        with BuildLine():
            Line((17.6150146872, 7.7234648176), (15.7396899178, 7.7234648176))
            ThreePointArc((15.7396899178, 7.7234648176), (16.2872002651, 6.3869593582), (17.6150146872, 5.8186959653))
            Line((17.6150146872, 5.8186959653), (17.6150146872, 7.7234648176))
        make_face()
        with BuildLine():
            Line((-18.5503100822, 7.7234648176), (-20.4553100822, 7.7234648176))
            Line((-20.4553100822, 7.7234648176), (-20.4553100822, 5.8184648176))
            ThreePointArc((-20.4553100822, 5.8184648176), (-19.1082716641, 6.3764263994), (-18.5503100822, 7.7234648176))
        make_face()
        with BuildLine():
            Line((15.7396899178, 7.7234648176), (4.5798489872, 7.7234648176))
            Line((4.5798489872, 7.7234648176), (4.5798489872, -1.8015351824))
            Line((4.5798489872, -1.8015351824), (17.6150146872, -1.8015351824))
            Line((17.6150146872, -1.8015351824), (17.6150146872, 5.8186959653))
            ThreePointArc((17.6150146872, 5.8186959653), (16.2872002651, 6.3869593582), (15.7396899178, 7.7234648176))
        make_face()
        with Locations((-1.4201510128, 12.9409648176)):
            Rectangle(F0_W_3, F0_H_3)
        with BuildLine():
            Line((-7.4201510128, 7.7234648176), (-18.5503100822, 7.7234648176))
            ThreePointArc((-18.5503100822, 7.7234648176), (-19.1082716641, 6.3764263994), (-20.4553100822, 5.8184648176))
            Line((-20.4553100822, 5.8184648176), (-20.4553100822, -1.8015351824))
            Line((-20.4553100822, -1.8015351824), (-7.4201510128, -1.8015351824))
            Line((-7.4201510128, -1.8015351824), (-7.4201510128, 7.7234648176))
        make_face()
        with Locations((-4.4127305475, 2.9609648176)):
            Rectangle(F0_W, F0_H)
        with BuildLine():
            Line((17.6150146872, -1.8015351824), (4.5798489872, -1.8015351824))
            Line((4.5798489872, -1.8015351824), (4.5798489872, -8.1515351824))
            Line((4.5798489872, -8.1515351824), (-1.4053100822, -8.1515351824))
            Line((-1.4053100822, -8.1515351824), (-1.4053100822, -11.3265351824))
            Line((-1.4053100822, -11.3265351824), (15.7396899178, -11.3265351824))
            ThreePointArc((15.7396899178, -11.3265351824), (16.2872002651, -9.9900297231), (17.6150146872, -9.4217663301))
            Line((17.6150146872, -9.4217663301), (17.6150146872, -1.8015351824))
        make_face()
        with BuildLine():
            Line((-7.4201510128, -1.8015351824), (-20.4553100822, -1.8015351824))
            Line((-20.4553100822, -1.8015351824), (-20.4553100822, -9.4215351824))
            ThreePointArc((-20.4553100822, -9.4215351824), (-19.1082716641, -9.9794967643), (-18.5503100822, -11.3265351824))
            Line((-18.5503100822, -11.3265351824), (-1.4053100822, -11.3265351824))
            Line((-1.4053100822, -11.3265351824), (-1.4053100822, -8.1515351824))
            Line((-1.4053100822, -8.1515351824), (-7.4201510128, -8.1515351824))
            Line((-7.4201510128, -8.1515351824), (-7.4201510128, -1.8015351824))
        make_face()
        with Locations((-4.4127305475, -4.9765351824)):
            Rectangle(F0_W, F0_H_2)
        with Locations((1.5872694525, -4.9765351824)):
            Rectangle(F0_W_2, F0_H_2)
        with Locations((1.5872694525, 2.9609648176)):
            Rectangle(F0_W_2, F0_H)
        Polygon((-20.5555241555, 17.8834648176), (-20.5555241555, 15.3434648176), (17.6150146872, 15.3434648176), (17.6306664944, 15.3434648176), (17.6306664944, 17.8834648176), align=None)
    extrude(amount=F3_DEPTH)


with BuildPart() as f4:
    # F0 (on Front) → F4 (new body)
    with BuildSketch(Plane.XZ.offset(F4_START)):
        with BuildLine():
            Line((-18.5503100822, 7.7234648176), (-20.4553100822, 7.7234648176))
            Line((-20.4553100822, 7.7234648176), (-20.4553100822, 5.8184648176))
            ThreePointArc((-20.4553100822, 5.8184648176), (-19.1082716641, 6.3764263994), (-18.5503100822, 7.7234648176))
        make_face()
        with BuildLine():
            ThreePointArc((-18.5503100822, -11.3265351824), (-19.1082716641, -9.9794967643), (-20.4553100822, -9.4215351824))
            Line((-20.4553100822, -9.4215351824), (-20.4553100822, -11.3265351824))
            Line((-20.4553100822, -11.3265351824), (-18.5503100822, -11.3265351824))
        make_face()
        with BuildLine():
            ThreePointArc((17.6150146872, -9.4217663301), (16.2872002651, -9.9900297231), (15.7396899178, -11.3265351824))
            Line((15.7396899178, -11.3265351824), (17.6150146872, -11.3265351824))
            Line((17.6150146872, -11.3265351824), (17.6150146872, -9.4217663301))
        make_face()
        with BuildLine():
            Line((17.6150146872, 7.7234648176), (15.7396899178, 7.7234648176))
            ThreePointArc((15.7396899178, 7.7234648176), (16.2872002651, 6.3869593582), (17.6150146872, 5.8186959653))
            Line((17.6150146872, 5.8186959653), (17.6150146872, 7.7234648176))
        make_face()
        with BuildLine():
            Line((-7.4201510128, 7.7234648176), (-18.5503100822, 7.7234648176))
            ThreePointArc((-18.5503100822, 7.7234648176), (-19.1082716641, 6.3764263994), (-20.4553100822, 5.8184648176))
            Line((-20.4553100822, 5.8184648176), (-20.4553100822, -1.8015351824))
            Line((-20.4553100822, -1.8015351824), (-7.4201510128, -1.8015351824))
            Line((-7.4201510128, -1.8015351824), (-7.4201510128, 7.7234648176))
        make_face()
        with BuildLine():
            Line((4.5798489872, 11.5334648176), (4.5798489872, 7.7234648176))
            Line((4.5798489872, 7.7234648176), (15.7396899178, 7.7234648176))
            ThreePointArc((15.7396899178, 7.7234648176), (16.2872002651, 9.0599702769), (17.6150146872, 9.6282336699))
            Line((17.6150146872, 9.6282336699), (17.6150146872, 11.5334648176))
            Line((17.6150146872, 11.5334648176), (4.5798489872, 11.5334648176))
        make_face()
        with BuildLine():
            Line((15.7396899178, 7.7234648176), (4.5798489872, 7.7234648176))
            Line((4.5798489872, 7.7234648176), (4.5798489872, -1.8015351824))
            Line((4.5798489872, -1.8015351824), (17.6150146872, -1.8015351824))
            Line((17.6150146872, -1.8015351824), (17.6150146872, 5.8186959653))
            ThreePointArc((17.6150146872, 5.8186959653), (16.2872002651, 6.3869593582), (15.7396899178, 7.7234648176))
        make_face()
        with BuildLine():
            Line((17.6150146872, -1.8015351824), (4.5798489872, -1.8015351824))
            Line((4.5798489872, -1.8015351824), (4.5798489872, -8.1515351824))
            Line((4.5798489872, -8.1515351824), (-1.4053100822, -8.1515351824))
            Line((-1.4053100822, -8.1515351824), (-1.4053100822, -11.3265351824))
            Line((-1.4053100822, -11.3265351824), (15.7396899178, -11.3265351824))
            ThreePointArc((15.7396899178, -11.3265351824), (16.2872002651, -9.9900297231), (17.6150146872, -9.4217663301))
            Line((17.6150146872, -9.4217663301), (17.6150146872, -1.8015351824))
        make_face()
        with BuildLine():
            Line((-7.4201510128, -1.8015351824), (-20.4553100822, -1.8015351824))
            Line((-20.4553100822, -1.8015351824), (-20.4553100822, -9.4215351824))
            ThreePointArc((-20.4553100822, -9.4215351824), (-19.1082716641, -9.9794967643), (-18.5503100822, -11.3265351824))
            Line((-18.5503100822, -11.3265351824), (-1.4053100822, -11.3265351824))
            Line((-1.4053100822, -11.3265351824), (-1.4053100822, -8.1515351824))
            Line((-1.4053100822, -8.1515351824), (-7.4201510128, -8.1515351824))
            Line((-7.4201510128, -8.1515351824), (-7.4201510128, -1.8015351824))
        make_face()
        Polygon((-20.5555241555, 11.5334648176), (-7.4201510128, 11.5334648176), (-7.4201510128, 14.3484648176), (4.5798489872, 14.3484648176), (4.5798489872, 11.5334648176), (17.6150146872, 11.5334648176), (17.6150146872, 15.3434648176), (-20.5555241555, 15.3434648176), align=None)
        Polygon((-20.5555241555, 17.8834648176), (-20.5555241555, 15.3434648176), (17.6150146872, 15.3434648176), (17.6306664944, 15.3434648176), (17.6306664944, 17.8834648176), align=None)
        with BuildLine():
            ThreePointArc((-20.5555241555, 9.62582707), (-19.1441813337, 9.1054801593), (-18.5503100822, 7.7234648176))
            Line((-18.5503100822, 7.7234648176), (-7.4201510128, 7.7234648176))
            Line((-7.4201510128, 7.7234648176), (-7.4201510128, 11.5334648176))
            Line((-7.4201510128, 11.5334648176), (-20.5555241555, 11.5334648176))
            Line((-20.5555241555, 11.5334648176), (-20.5555241555, 9.62582707))
        make_face()
        with BuildLine():
            Line((-20.4553100822, 5.8184648176), (-20.4553100822, 7.7234648176))
            Line((-20.4553100822, 7.7234648176), (-18.5503100822, 7.7234648176))
            ThreePointArc((-18.5503100822, 7.7234648176), (-19.1441813337, 9.1054801593), (-20.5555241555, 9.62582707))
            Line((-20.5555241555, 9.62582707), (-20.5555241555, 5.8211025651))
            ThreePointArc((-20.5555241555, 5.8211025651), (-20.505434473, 5.8191243686), (-20.4553100822, 5.8184648176))
        make_face()
        with BuildLine():
            ThreePointArc((17.6150146872, 9.6282336699), (16.2872002651, 9.0599702769), (15.7396899178, 7.7234648176))
            Line((15.7396899178, 7.7234648176), (17.6150146872, 7.7234648176))
            Line((17.6150146872, 7.7234648176), (17.6150146872, 9.6282336699))
        make_face()
        Polygon((17.6150146872, -15.1364773988), (-20.5555241555, -15.1364773988), (-20.5555241555, -18.9351737499), (-20.5555241555, -18.9464773988), (-7.8555241555, -18.9464773988), (4.9150146872, -18.9464773988), (17.6150146872, -18.9464773988), align=None)
        with BuildLine():
            Line((-1.4053100822, -11.3265351824), (-18.5503100822, -11.3265351824))
            ThreePointArc((-18.5503100822, -11.3265351824), (-19.1441813337, -12.7085505242), (-20.5555241555, -13.2288974349))
            Line((-20.5555241555, -13.2288974349), (-20.5555241555, -15.1364773988))
            Line((-20.5555241555, -15.1364773988), (17.6150146872, -15.1364773988))
            Line((17.6150146872, -15.1364773988), (17.6150146872, -13.2313040347))
            ThreePointArc((17.6150146872, -13.2313040347), (16.2872002651, -12.6630406418), (15.7396899178, -11.3265351824))
            Line((15.7396899178, -11.3265351824), (-1.4053100822, -11.3265351824))
        make_face()
        with BuildLine():
            Line((17.6150146872, -11.3265351824), (15.7396899178, -11.3265351824))
            ThreePointArc((15.7396899178, -11.3265351824), (16.2872002651, -12.6630406418), (17.6150146872, -13.2313040347))
            Line((17.6150146872, -13.2313040347), (17.6150146872, -11.3265351824))
        make_face()
        with BuildLine():
            Line((-20.4553100822, -11.3265351824), (-20.4553100822, -9.4215351824))
            ThreePointArc((-20.4553100822, -9.4215351824), (-20.505434473, -9.4221947335), (-20.5555241555, -9.42417293))
            Line((-20.5555241555, -9.42417293), (-20.5555241555, -13.2288974349))
            ThreePointArc((-20.5555241555, -13.2288974349), (-19.1441813337, -12.7085505242), (-18.5503100822, -11.3265351824))
            Line((-18.5503100822, -11.3265351824), (-20.4553100822, -11.3265351824))
        make_face()
        with BuildLine():
            Line((4.9150146872, -18.9464773988), (-7.8555241555, -18.9464773988))
            Line((-7.8555241555, -18.9464773988), (-7.8555241555, -23.7456746399))
            Line((-7.8555241555, -23.7456746399), (-3.8515047342, -23.7456746399))
            ThreePointArc((-3.8515047342, -23.7456746399), (-1.4702547342, -21.3644246399), (0.9109952658, -23.7456746399))
            Line((0.9109952658, -23.7456746399), (4.9150146872, -23.7456746399))
            Line((4.9150146872, -23.7456746399), (4.9150146872, -18.9464773988))
        make_face()
    extrude(amount=F4_DEPTH)


with BuildPart() as f5:
    # F5 (new): a face of the model
    f5_faces = [f1.part.faces().sort_by_distance(p)[0] for p in [
        (-1.4702547342, -2.54, -21.1098954037),
    ]]
    extrude(f5_faces, amount=F5_DEPTH)


with BuildPart() as f1_1:
    add(f1.part)

    # F6 (on Top) → F7 (cut, two sides)
    with BuildSketch(Plane.XY) as f7_sk:
        with Locations((15.8150778152, -26.0699142236)):
            Rectangle(F6_W, F6_H)
        with Locations((-18.7530079857, -26.1291065253)):
            Rectangle(F6_W_2, F6_H_2)
    extrude(amount=-F7_DEPTH, mode=Mode.SUBTRACT)
    extrude(f7_sk.sketch, amount=F7_DEPTH_BACK, mode=Mode.SUBTRACT)


solid = Compound([f3.part, f4.part, f5.part, f1_1.part])
